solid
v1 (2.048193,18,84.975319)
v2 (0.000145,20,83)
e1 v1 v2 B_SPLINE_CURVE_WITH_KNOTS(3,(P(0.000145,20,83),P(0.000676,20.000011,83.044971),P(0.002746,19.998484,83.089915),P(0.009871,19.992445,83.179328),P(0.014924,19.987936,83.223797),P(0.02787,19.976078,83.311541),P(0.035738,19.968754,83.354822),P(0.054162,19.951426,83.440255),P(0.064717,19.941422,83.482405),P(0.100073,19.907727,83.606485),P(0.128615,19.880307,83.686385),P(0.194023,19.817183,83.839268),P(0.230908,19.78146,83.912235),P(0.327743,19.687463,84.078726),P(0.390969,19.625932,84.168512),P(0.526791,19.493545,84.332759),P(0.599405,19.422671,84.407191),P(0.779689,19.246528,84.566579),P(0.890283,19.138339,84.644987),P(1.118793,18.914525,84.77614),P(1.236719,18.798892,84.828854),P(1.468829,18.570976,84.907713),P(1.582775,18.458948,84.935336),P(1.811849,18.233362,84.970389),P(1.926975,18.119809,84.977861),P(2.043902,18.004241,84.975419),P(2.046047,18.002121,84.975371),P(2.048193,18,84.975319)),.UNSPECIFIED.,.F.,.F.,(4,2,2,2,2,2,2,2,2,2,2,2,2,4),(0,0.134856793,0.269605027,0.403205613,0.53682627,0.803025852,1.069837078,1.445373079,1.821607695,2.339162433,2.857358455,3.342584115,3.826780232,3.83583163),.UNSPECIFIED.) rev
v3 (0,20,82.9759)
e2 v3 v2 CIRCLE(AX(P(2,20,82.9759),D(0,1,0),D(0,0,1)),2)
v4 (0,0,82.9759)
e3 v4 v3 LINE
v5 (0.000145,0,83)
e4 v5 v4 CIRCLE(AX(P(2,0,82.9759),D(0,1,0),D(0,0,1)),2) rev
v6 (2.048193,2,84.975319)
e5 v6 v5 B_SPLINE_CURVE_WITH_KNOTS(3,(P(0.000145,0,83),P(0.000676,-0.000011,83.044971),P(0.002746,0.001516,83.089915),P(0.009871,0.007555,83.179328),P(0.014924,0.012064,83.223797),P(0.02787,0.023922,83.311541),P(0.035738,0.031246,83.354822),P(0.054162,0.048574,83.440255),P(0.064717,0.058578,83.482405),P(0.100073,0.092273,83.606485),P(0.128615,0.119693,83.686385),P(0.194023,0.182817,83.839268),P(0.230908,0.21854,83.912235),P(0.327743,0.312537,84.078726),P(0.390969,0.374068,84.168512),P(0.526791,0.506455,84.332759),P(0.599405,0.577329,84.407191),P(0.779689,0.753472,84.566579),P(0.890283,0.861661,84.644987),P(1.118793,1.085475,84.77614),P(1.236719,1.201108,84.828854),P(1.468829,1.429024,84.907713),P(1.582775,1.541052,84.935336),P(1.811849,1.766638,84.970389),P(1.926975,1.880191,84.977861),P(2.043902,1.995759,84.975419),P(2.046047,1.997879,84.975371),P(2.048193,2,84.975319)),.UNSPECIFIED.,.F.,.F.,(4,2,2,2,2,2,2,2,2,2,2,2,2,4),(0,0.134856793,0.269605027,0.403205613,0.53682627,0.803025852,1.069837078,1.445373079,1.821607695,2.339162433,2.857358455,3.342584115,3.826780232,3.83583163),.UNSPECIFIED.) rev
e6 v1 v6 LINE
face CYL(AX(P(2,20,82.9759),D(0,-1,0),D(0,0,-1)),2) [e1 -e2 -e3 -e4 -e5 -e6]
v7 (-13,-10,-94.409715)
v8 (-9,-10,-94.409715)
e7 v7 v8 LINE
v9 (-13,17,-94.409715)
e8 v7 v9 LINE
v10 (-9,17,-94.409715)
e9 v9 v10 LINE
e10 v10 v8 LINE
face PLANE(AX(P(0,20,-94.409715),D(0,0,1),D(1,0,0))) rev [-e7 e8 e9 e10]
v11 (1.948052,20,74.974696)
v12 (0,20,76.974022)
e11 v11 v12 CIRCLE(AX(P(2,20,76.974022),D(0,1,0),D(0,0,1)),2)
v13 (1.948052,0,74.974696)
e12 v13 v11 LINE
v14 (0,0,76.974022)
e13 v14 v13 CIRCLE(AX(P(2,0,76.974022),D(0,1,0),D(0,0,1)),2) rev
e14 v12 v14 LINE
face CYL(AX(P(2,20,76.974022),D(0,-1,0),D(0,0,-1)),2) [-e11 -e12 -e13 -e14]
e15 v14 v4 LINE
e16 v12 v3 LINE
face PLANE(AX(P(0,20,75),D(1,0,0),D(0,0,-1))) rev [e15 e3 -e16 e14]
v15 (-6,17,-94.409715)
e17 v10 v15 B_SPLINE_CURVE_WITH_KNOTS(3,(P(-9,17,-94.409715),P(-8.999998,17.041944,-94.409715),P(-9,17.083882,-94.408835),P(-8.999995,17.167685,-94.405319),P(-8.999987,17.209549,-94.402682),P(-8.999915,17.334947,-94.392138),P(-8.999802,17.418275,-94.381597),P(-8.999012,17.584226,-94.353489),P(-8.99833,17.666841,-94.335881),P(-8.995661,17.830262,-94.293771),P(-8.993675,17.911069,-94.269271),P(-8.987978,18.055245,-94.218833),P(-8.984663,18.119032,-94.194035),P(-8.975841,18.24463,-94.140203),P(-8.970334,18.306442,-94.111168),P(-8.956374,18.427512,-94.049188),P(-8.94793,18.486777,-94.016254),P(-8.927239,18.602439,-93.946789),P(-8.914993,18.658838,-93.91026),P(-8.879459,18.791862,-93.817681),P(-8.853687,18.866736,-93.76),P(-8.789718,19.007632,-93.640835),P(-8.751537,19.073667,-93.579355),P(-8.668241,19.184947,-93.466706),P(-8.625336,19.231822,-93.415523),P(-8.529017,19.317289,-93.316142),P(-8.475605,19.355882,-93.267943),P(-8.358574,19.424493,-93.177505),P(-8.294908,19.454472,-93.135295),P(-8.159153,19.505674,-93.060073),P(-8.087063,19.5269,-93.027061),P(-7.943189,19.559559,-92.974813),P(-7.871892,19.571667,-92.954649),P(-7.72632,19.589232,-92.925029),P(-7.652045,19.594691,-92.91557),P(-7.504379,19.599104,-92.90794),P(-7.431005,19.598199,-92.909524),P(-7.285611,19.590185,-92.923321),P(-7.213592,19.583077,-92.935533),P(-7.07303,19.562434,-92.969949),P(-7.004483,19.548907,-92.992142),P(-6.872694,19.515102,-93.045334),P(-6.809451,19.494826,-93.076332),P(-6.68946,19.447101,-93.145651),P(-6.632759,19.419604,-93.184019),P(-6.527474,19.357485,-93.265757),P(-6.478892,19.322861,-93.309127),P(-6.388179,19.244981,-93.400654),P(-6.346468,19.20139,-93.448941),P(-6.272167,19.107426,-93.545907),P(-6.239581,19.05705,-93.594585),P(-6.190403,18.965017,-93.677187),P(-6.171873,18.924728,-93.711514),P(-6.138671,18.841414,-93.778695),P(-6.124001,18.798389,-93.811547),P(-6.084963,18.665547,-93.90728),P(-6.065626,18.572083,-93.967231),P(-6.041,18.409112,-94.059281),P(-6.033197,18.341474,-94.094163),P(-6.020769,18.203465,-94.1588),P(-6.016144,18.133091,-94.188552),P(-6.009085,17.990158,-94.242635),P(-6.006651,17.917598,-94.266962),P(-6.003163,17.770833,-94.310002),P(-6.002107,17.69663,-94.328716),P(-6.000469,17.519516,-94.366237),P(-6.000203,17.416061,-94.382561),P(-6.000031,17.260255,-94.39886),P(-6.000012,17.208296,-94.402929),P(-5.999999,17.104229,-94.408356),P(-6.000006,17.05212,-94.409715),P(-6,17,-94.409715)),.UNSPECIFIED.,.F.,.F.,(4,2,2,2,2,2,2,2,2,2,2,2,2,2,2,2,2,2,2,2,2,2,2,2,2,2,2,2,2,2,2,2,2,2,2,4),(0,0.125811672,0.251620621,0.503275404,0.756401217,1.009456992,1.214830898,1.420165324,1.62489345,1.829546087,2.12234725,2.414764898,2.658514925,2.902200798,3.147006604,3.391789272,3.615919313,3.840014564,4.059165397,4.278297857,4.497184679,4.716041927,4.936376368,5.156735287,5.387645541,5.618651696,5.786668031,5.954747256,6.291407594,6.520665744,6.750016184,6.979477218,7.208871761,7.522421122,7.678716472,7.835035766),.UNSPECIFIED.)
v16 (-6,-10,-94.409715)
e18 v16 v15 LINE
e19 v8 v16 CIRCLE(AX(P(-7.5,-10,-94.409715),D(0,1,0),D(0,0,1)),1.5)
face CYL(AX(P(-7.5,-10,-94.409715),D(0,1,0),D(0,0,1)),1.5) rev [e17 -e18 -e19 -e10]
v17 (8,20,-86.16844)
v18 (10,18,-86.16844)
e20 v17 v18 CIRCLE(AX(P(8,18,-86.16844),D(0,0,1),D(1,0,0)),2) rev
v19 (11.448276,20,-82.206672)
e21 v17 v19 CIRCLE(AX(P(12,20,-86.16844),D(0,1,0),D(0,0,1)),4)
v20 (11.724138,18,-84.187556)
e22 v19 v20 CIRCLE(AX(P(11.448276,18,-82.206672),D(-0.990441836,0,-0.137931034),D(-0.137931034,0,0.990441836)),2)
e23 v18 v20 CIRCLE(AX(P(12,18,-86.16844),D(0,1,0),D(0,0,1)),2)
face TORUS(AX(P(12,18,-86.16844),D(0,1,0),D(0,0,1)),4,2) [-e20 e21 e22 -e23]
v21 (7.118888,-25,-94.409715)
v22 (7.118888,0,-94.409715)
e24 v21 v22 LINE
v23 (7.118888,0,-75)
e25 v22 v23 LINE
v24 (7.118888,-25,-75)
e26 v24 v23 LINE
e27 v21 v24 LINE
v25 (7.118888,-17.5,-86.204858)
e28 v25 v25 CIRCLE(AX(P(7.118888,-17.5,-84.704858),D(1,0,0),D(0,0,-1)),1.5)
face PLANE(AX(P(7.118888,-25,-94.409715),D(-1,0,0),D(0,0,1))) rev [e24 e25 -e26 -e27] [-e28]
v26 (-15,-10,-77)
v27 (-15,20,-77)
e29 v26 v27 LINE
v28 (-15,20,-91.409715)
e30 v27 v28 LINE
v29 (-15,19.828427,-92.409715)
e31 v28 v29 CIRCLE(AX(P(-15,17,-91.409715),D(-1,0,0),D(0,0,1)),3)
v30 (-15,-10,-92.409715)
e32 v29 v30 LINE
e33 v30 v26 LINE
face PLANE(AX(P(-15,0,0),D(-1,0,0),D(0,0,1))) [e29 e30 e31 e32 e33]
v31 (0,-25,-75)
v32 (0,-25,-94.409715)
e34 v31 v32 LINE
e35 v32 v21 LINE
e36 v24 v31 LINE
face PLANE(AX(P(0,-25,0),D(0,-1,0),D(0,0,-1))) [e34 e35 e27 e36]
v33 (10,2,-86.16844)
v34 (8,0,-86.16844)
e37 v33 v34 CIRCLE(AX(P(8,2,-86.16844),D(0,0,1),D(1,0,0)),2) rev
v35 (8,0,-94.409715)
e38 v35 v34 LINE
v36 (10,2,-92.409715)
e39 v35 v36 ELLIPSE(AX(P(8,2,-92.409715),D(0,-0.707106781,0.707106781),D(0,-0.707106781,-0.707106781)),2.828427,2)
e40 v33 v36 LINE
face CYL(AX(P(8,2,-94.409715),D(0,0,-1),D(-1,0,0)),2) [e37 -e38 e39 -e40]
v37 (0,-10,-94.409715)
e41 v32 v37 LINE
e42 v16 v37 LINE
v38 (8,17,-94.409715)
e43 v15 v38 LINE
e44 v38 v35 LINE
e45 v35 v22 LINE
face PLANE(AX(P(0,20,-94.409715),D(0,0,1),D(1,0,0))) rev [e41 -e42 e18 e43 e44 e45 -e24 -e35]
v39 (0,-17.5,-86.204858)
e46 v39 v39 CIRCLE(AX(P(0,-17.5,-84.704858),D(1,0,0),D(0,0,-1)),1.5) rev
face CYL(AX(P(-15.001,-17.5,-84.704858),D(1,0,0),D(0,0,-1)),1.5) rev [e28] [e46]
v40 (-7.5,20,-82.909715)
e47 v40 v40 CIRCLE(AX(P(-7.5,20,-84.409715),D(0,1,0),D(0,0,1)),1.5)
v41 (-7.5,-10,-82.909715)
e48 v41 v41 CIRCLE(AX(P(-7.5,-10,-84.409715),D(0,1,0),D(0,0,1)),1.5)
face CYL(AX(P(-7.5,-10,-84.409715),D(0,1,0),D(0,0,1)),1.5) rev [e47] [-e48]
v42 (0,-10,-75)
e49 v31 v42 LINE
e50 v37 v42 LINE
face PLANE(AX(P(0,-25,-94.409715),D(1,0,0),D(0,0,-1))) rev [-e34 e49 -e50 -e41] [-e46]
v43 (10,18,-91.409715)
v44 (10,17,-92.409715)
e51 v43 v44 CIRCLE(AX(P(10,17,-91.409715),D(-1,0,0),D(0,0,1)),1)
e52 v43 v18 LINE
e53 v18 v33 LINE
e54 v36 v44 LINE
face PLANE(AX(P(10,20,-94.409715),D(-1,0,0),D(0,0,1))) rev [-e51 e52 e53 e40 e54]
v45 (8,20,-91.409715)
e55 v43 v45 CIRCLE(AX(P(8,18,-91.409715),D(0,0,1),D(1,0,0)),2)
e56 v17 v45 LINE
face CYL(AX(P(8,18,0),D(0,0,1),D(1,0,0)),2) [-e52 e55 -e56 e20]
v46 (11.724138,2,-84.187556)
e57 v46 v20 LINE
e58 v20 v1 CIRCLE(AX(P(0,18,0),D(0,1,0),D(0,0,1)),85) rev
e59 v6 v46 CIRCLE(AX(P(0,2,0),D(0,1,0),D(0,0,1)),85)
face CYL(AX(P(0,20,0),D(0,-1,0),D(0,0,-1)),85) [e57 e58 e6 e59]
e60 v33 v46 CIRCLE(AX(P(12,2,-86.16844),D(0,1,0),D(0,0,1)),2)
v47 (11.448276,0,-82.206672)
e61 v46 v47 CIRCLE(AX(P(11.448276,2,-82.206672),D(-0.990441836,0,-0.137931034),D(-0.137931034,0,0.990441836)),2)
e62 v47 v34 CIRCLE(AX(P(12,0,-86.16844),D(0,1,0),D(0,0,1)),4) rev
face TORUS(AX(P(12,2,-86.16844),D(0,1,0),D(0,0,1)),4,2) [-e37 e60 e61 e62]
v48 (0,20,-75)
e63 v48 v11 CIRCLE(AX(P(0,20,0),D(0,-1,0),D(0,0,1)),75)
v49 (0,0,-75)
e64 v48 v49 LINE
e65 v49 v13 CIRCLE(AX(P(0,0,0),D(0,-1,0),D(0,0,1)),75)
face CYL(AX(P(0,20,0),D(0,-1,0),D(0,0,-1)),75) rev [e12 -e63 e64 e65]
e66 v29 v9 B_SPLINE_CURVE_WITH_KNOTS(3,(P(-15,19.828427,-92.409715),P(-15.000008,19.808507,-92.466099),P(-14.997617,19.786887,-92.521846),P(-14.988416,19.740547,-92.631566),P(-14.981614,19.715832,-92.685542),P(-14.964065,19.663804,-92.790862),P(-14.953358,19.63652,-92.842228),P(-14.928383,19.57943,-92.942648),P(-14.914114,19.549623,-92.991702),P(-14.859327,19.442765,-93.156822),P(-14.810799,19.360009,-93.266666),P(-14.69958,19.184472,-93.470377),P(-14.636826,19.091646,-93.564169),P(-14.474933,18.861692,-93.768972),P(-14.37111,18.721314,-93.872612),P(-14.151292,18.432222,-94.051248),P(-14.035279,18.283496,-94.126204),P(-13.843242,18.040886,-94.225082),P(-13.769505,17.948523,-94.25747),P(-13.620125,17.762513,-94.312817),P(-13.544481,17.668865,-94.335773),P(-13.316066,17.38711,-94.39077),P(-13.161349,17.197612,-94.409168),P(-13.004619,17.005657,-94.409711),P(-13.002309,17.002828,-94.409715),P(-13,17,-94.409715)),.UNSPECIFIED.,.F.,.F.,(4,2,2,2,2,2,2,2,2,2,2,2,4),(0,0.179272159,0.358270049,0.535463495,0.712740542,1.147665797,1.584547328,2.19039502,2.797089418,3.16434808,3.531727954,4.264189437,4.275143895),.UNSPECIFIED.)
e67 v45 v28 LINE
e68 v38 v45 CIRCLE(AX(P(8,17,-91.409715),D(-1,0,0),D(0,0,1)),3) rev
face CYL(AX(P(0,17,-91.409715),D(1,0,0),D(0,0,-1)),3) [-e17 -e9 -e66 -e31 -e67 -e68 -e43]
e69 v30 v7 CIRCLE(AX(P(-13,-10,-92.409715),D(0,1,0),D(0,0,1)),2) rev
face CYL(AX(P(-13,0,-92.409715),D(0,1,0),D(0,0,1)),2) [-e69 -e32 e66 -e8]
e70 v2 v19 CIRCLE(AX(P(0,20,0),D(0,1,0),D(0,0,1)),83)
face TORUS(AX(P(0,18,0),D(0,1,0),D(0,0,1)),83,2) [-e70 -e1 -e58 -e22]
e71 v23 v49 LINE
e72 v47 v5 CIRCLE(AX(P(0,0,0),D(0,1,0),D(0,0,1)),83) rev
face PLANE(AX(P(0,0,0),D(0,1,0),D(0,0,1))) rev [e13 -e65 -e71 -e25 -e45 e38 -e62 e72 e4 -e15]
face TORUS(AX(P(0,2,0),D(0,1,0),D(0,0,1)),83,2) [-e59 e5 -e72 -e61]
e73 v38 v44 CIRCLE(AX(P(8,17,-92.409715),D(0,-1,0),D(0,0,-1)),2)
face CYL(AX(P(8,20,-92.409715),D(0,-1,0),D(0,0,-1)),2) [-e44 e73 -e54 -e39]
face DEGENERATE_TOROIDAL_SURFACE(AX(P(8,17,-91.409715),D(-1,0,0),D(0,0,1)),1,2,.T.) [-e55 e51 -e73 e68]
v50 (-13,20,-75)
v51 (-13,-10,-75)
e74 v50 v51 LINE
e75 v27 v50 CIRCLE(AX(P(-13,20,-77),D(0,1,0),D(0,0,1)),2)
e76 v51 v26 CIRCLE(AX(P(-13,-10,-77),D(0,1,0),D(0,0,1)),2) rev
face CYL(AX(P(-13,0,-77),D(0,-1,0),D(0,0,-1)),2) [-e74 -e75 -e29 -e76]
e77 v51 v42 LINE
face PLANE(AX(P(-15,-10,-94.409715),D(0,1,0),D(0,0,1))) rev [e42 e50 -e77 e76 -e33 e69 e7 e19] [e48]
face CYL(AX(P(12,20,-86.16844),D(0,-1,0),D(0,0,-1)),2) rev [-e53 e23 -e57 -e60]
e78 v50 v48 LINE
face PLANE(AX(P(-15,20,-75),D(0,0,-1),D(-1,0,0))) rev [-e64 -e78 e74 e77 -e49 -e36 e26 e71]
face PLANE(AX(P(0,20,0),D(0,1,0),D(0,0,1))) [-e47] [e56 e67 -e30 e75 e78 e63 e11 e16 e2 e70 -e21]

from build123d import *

# Parameters (mm, degrees)
BOSS_EXTRUDE1_DEPTH = 20
SKETCH3_W           = 19.409715081
SKETCH3_H           = 30
BOSS_EXTRUDE3_DEPTH = 15
FILLET1_R           = 2
SKETCH4_R           = 1.5
CUT_EXTRUDE1_DEPTH  = 131.530434453
FILLET2_R           = 3
SKETCH7_W           = 7.118887736
SKETCH7_H           = 19.409715081
BOSS_EXTRUDE5_DEPTH = 25
CUT_EXTRUDE3_REACH  = 126.915
SKETCH9_R           = 1.5


with BuildPart() as part:
    # Sketch1 → Boss-Extrude1 (new body)
    with BuildSketch(Plane(origin=(0, 0, 0), x_dir=(1, 0, 0), z_dir=(0, 1, 0))):
        with BuildLine():
            Line((0, -75), (0, -85))
            ThreePointArc((0, -85), (84.852300446, -5.008703332), (10, 84.409715081))
            Line((10, 84.409715081), (10, 94.409715081))
            Line((10, 94.409715081), (0, 94.409715081))
            Line((0, 94.409715081), (0, 75))
            ThreePointArc((0, 75), (75, 0), (0, -75))
        make_face()
    extrude(amount=BOSS_EXTRUDE1_DEPTH)

    # Sketch3 → Boss-Extrude3 (add)
    with BuildSketch(Plane.ZY):
        with Locations((-84.704857541, 5)):
            Rectangle(SKETCH3_W, SKETCH3_H)
    extrude(amount=BOSS_EXTRUDE3_DEPTH)

    # Fillet1
    fillet1_edges = [part.edges().sort_by_distance(p)[0] for p in [
        (84.852300446, 20, 5.008703332),
        (10, 10, -94.409715081),
        (10, 10, -84.409715081),
        (0, 10, 85),
        (0, 10, 75),
        (10, 20, -89.409715081),
        (-15, 5, -94.409715081),
        (-15, 5, -75),
        (10, 0, -89.409715081),
        (84.852300446, 0, 5.008703332),
    ]]
    fillet(fillet1_edges, radius=FILLET1_R)

    # Sketch4 → Cut-Extrude1 (cut, through all)
    with BuildSketch(Plane(origin=(0, 20, 0), x_dir=(1, 0, 0), z_dir=(0, 1, 0))):
        with Locations(Location((-7.5, 84.409715081, 0), (0, 0, 270))):
            Circle(SKETCH4_R)
        with Locations((-7.5, 94.409715081)):
            Circle(SKETCH4_R)
    extrude(amount=-CUT_EXTRUDE1_DEPTH, mode=Mode.SUBTRACT)

    # Fillet2
    # the kernel refuses this fillet: 3 mm, written as the material it takes off along each edge
    with BuildSketch(Plane(origin=(10, 17, -91.409715081), x_dir=(0, 0, -1), z_dir=(0, -1, 0))) as fillet2_piece_1:
        with BuildLine():
            CenterArc((1, -2), 2, 0, 90)
            Line((3, -2), (3, 0))
            Line((3, 0), (1, 0))
        make_face()
    revolve(axis=Axis((10, 17, -91.409715081), (1, 0, 0)), revolution_arc=90, mode=Mode.SUBTRACT)
    with BuildSketch(Plane(origin=(-20.5, 20, -94.409715081), x_dir=(0, 0, 1), z_dir=(1, 0, 0))) as fillet2_piece_2:
        with BuildLine():
            CenterArc((FILLET2_R, FILLET2_R), FILLET2_R, 180, 90)
            Line((0, FILLET2_R), (0, 0))
            Line((0, 0), (FILLET2_R, 0))
        make_face()
    extrude(amount=19, mode=Mode.SUBTRACT)
    with BuildSketch(Plane(origin=(-13.5, 20, -94.409715081), x_dir=(0, -1, 0), z_dir=(1, 0, 0))) as fillet2_piece_3:
        with BuildLine():
            CenterArc((FILLET2_R, -FILLET2_R), FILLET2_R, 90, 90)
            Line((0, -FILLET2_R), (0, 0))
            Line((0, 0), (FILLET2_R, 0))
        make_face()
    extrude(amount=23.5, mode=Mode.SUBTRACT)

    # Sketch7 → Boss-Extrude5 (add)
    with BuildSketch(Plane(origin=(0, 0, 0), x_dir=(-1, 0, 0), z_dir=(0, -1, 0))):
        with Locations((-3.559443868, 84.704857541)):
            Rectangle(SKETCH7_W, SKETCH7_H)
    extrude(amount=BOSS_EXTRUDE5_DEPTH)

    # Sketch9 → Cut-Extrude3 (cut, up to next)
    with BuildSketch(Plane(origin=(7.118887736, 0, 0), x_dir=(0, 0, -1), z_dir=(1, 0, 0)), mode=Mode.PRIVATE) as cut_extrude3_sk1:
        with Locations((84.70485754, -17.5)):
            Circle(SKETCH9_R)
    cut_extrude3_tool1 = extrude(cut_extrude3_sk1.sketch, amount=-CUT_EXTRUDE3_REACH, mode=Mode.PRIVATE) & part.part
    add(cut_extrude3_tool1.solids().sort_by_distance((7.118888, -17.5, -84.704858))[0], mode=Mode.SUBTRACT)


solid = part.part
